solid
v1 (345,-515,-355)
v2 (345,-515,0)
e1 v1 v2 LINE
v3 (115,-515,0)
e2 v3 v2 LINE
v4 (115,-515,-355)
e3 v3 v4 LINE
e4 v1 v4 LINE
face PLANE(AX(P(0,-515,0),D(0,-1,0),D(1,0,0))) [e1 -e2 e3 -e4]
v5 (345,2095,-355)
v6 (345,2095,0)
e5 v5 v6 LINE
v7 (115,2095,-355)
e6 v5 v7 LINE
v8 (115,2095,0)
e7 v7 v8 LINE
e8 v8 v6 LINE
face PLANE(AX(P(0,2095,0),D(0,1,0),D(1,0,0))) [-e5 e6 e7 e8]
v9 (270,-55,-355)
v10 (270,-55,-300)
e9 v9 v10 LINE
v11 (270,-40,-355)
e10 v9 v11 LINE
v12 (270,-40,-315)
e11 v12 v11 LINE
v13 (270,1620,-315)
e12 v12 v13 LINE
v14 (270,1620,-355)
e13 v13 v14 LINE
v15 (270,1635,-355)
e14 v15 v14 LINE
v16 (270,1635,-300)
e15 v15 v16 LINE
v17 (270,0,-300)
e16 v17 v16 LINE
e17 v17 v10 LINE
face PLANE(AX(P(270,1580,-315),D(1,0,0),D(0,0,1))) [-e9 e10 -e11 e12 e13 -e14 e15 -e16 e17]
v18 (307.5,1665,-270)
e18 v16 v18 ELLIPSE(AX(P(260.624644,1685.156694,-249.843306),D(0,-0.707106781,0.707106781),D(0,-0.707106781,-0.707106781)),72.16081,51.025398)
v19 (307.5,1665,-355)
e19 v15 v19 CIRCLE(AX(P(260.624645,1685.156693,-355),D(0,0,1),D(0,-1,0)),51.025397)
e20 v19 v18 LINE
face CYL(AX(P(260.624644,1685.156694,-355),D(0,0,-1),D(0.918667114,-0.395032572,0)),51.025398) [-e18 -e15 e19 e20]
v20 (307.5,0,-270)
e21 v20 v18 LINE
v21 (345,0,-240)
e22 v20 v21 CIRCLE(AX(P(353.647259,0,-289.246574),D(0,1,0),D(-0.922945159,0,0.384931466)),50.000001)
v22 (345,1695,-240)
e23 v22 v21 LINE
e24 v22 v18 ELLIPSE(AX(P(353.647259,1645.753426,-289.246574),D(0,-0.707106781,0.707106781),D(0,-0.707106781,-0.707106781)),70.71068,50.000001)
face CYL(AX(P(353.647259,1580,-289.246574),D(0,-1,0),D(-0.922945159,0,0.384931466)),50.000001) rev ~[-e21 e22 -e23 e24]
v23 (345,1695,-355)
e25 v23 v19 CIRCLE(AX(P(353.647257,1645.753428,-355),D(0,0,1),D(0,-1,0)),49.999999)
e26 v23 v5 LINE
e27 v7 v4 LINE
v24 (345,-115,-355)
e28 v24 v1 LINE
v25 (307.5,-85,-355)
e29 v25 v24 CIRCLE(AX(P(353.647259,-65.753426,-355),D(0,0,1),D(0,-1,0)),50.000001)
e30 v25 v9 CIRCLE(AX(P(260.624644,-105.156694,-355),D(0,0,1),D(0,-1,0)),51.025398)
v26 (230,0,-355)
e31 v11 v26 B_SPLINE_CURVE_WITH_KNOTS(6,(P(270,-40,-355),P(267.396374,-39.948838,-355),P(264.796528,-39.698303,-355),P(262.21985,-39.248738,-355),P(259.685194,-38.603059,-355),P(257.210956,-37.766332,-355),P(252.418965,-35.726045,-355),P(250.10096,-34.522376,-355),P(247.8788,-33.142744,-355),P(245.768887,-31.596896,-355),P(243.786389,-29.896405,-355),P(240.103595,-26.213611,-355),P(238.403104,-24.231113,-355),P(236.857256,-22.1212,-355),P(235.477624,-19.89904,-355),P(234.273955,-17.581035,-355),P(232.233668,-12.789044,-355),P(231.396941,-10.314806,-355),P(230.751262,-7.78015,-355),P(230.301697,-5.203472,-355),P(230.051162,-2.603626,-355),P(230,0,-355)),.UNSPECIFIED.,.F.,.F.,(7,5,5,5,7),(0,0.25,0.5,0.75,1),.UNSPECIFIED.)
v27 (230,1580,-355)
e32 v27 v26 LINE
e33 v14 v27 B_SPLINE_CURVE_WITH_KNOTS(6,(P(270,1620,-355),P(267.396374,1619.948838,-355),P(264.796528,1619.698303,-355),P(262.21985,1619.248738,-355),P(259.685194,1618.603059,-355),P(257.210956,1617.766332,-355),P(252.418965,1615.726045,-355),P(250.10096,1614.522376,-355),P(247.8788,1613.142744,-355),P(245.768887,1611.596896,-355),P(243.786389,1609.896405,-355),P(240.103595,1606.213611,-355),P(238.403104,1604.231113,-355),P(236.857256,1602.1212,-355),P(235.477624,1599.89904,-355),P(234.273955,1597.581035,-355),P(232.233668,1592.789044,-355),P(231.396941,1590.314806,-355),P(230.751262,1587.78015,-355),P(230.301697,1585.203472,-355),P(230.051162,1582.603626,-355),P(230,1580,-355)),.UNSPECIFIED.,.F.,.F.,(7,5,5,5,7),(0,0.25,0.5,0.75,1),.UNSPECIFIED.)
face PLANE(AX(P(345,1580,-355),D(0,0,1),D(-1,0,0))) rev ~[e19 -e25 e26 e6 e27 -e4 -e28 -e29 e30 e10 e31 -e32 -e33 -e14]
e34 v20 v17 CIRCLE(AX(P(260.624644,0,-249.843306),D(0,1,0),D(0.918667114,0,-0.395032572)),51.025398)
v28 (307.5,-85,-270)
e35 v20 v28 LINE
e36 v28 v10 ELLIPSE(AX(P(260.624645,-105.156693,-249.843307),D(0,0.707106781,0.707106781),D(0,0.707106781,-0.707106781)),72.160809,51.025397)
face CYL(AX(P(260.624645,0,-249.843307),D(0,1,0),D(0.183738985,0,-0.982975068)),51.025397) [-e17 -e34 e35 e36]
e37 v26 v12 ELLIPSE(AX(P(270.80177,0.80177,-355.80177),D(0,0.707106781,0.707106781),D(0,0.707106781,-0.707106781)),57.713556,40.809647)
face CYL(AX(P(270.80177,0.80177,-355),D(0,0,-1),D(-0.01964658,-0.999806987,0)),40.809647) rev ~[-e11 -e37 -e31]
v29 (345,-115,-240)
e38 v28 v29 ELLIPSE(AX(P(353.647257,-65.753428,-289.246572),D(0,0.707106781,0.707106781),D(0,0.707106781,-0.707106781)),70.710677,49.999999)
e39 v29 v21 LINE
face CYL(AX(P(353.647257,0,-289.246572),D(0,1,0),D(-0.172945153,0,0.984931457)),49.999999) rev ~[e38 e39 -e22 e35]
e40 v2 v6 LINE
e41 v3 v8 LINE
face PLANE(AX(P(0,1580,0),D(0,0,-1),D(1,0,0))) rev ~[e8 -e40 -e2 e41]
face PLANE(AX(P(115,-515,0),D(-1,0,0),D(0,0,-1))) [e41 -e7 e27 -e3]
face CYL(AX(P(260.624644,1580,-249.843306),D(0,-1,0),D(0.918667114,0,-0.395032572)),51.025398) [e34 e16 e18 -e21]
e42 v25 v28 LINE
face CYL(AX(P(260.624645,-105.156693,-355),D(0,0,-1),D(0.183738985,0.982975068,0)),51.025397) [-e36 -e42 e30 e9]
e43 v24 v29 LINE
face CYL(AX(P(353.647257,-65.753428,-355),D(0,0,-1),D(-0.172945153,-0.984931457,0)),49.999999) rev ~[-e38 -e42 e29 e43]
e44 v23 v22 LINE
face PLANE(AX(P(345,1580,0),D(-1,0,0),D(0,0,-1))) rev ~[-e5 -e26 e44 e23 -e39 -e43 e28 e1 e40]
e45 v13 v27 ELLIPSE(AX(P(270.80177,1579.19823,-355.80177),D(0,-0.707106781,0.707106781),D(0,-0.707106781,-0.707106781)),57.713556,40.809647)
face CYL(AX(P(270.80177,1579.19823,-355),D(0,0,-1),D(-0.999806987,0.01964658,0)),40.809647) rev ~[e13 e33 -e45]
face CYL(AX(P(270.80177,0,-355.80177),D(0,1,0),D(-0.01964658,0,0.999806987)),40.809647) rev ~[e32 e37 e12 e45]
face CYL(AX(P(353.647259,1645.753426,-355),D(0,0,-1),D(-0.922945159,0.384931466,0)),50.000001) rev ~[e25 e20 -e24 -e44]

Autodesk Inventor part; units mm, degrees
ref_plane "YZ Plane" through (0, 0, 0) normal (1, 0, 0) x (0, 1, 0)
ref_plane "XZ Plane" through (0, 0, 0) normal (0, 1, 0) x (-1, 0, 0)
ref_plane "XY Plane" through (0, 0, 0) normal (0, 0, 1) x (1, 0, 0)
sketch "Sketch1" plane through (0, 0, 0) normal (0, 1, 0) x (-1, 0, 0)
  line L0 (0, 0) -> (0, -300)
  line L1 (0, -300) -> (-115, -300)
  line L2 (-115, -300) -> (-115, -355)
  line L3 (-115, -355) -> (-230, -355)
  line L4 (-230, -355) -> (-345, -355) construction
  line L5 (0, 0) -> (-345, 0)
  line L6 (-345, 0) -> (-345, -240)
  line L7 (-270, -300) -> (-270, -315)
  line L8 (-345, -240) -> (-270, -300) construction
  line L9 (-307.5, -270) -> (-270, -300) construction
  line L10 (-307.5, -270) -> (-345, -240) construction
  arc A0 (-307.5, -270) -> (-270, -300) centre (-260.624645, -249.843306) ccw
  arc A1 (-307.5, -270) -> (-345, -240) centre (-353.647258, -289.246573) ccw
  arc A2 (-230, -355) -> (-270, -315) centre (-270.80177, -355.80177) ccw
  point P0 (-288.75, -285)
  point P1 (-326.25, -255)
  dimension "d0" = 300
  dimension "d1" = 115
  dimension "d2" = 55
  dimension "d3" = 115
  dimension "d4" = 115
  dimension "d5" = 345
  dimension "d7" = 15
  dimension "d8" = 155
  dimension "d9" = 40
  dimension "d13" = 50
  dimension "d14" = 50
  dimension "d16" = 62.5
  dimension "d19" = 60
extrude "Extrusion1" add sketch "Sketch1" along normal blind 299
sketch "Sketch2" plane through (0, 299, 0) normal (0, 1, 0) x (1, 0, 0)
  line L0 (230, 355) -> (115, 355)
  line L1 (115, 355) -> (115, 300)
  line L2 (115, 300) -> (0, 300)
  line L3 (0, 300) -> (0, 0)
  line L4 (0, 0) -> (345, 0)
  line L5 (345, 0) -> (345, 240)
  arc A0 (307.5, 270) -> (345, 240) centre (353.647258, 289.246573) ccw
  arc A1 (307.5, 270) -> (270, 300) centre (260.624645, 249.843306) ccw
  line L6 (270, 300) -> (270, 315)
  arc A2 (230, 355) -> (270, 315) centre (270.80177, 355.80177) ccw
extrude "Extrusion2" add sketch "Sketch2" along normal blind 1281
sketch "Sketch3" plane through (0, 0, 0) normal (0, -1, 0) x (1, 0, 0)
  line L0 (230, -355) -> (115, -355) projected
  line L1 (115, -355) -> (115, -300) projected
  line L2 (115, -300) -> (0, -300) projected
  line L3 (0, -300) -> (0, 0) projected
  line L4 (0, 0) -> (345, 0) projected
  line L5 (345, 0) -> (345, -240) projected
  line L6 (230, -355) -> (345, -355)
  line L7 (345, -355) -> (345, -240)
extrude "Extrusion3" add sketch "Sketch3" along normal blind 515
sketch "Sketch4" plane through (0, 1580, 0) normal (0, 1, 0) x (1, 0, 0)
  line L0 (345, 0) -> (345, 240) projected
  line L1 (0, 0) -> (345, 0) projected
  line L2 (0, 300) -> (0, 0) projected
  line L3 (115, 300) -> (0, 300) projected
  line L4 (115, 355) -> (115, 300) projected
  line L5 (345, 355) -> (345, 240) projected
  line L6 (345, 240) -> (345, 355)
  line L7 (345, 355) -> (115, 355)
extrude "Extrusion4" add sketch "Sketch4" along normal blind 515
sketch "Sketch5" plane through (0, 1580, 0) normal (0, -1, 0) x (1, 0, 0)
  arc A0 (270, -315) -> (230, -355) centre (270.80177, -355.80177) ccw
  line L0 (345, -355) -> (230, -355)
  line L1 (345, -240) -> (345, -355)
  arc A1 (345, -240) -> (307.5, -270) centre (353.647258, -289.246573) ccw
  arc A2 (270, -300) -> (307.5, -270) centre (260.624645, -249.843306) ccw
  line L2 (270, -300) -> (270, -315)
  line L3 (424.37671, -355) -> (-70.729452, -355)
  point P0 (0, 0)
revolve "Revolution1" cut sketch "Sketch5" angle 360 about axis through (345, 1580, -355) along (-1, 0, 0)
sketch "Sketch6" plane through (0, 0, 0) normal (0, 1, 0) x (1, 0, 0)
  arc A0 (307.5, 270) -> (345, 240) centre (353.647258, 289.246573) ccw
  line L0 (345, 355) -> (345, 240)
  line L1 (230, 355) -> (345, 355)
  arc A1 (230, 355) -> (270, 315) centre (270.80177, 355.80177) ccw
  line L2 (270, 300) -> (270, 315)
  arc A2 (307.5, 270) -> (270, 300) centre (260.624645, 249.843306) ccw
  line L3 (-70.729452, 355) -> (424.37671, 355)
  point P0 (0, 0)
revolve "Revolution2" cut sketch "Sketch6" angle 360 about axis through (115, 0, -355) along (1, 0, 0)
sketch "Sketch12" plane through (345, -515, -355) normal (0, 0, -1) x (-1, 0, 0)
  arc A0 (0, 400) -> (37.5, 430) centre (-8.647258, 449.246573) ccw
  arc A1 (75, 460) -> (37.5, 430) centre (84.375355, 409.843306) ccw
  line L0 (75, 475) -> (75, 460)
  arc A2 (75, 475) -> (115, 515) centre (74.19823, 515.80177) ccw
  line L1 (0, 515) -> (37.5, 515)
  line L2 (75, 515) -> (37.5, 515)
  line L3 (75, 515) -> (115, 515)
  line L4 (0, 400) -> (0, 515)
  point P0 (345, 515)
extrude "Extrusion10" cut sketch "Sketch12" against normal blind 115
sketch "Sketch13" plane through (345, -515, -355) normal (0, 0, -1) x (-1, 0, 0)
  arc A0 (115, 2095) -> (75, 2135) centre (74.19823, 2094.19823) ccw
  line L0 (75, 2150) -> (75, 2135)
  arc A1 (37.5, 2180) -> (75, 2150) centre (84.375355, 2200.156694) ccw
  arc A2 (37.5, 2180) -> (0, 2210) centre (-8.647258, 2160.753427) ccw
  line L1 (0, 2095) -> (0, 2210)
  line L2 (0, 2095) -> (37.5, 2095)
  line L3 (75, 2095) -> (37.5, 2095)
  line L4 (75, 2095) -> (115, 2095)
  point P0 (345, 515)
extrude "Extrusion11" cut sketch "Sketch13" against normal blind 115
sketch "Sketch14" plane through (230, 0, -240) normal (0, -1, 0) x (1, 0, 0)
  arc A0 (40, -75) -> (0, -115) centre (40.80177, -115.80177) ccw
  line L0 (40, -60) -> (40, -75)
  arc A1 (40, -60) -> (77.5, -30) centre (30.624645, -9.843306) ccw
  arc A2 (115, 0) -> (77.5, -30) centre (123.647258, -49.246573) ccw
  line L1 (115, 0) -> (0, 0)
  line L2 (0, -115) -> (0, 0)
  point P0 (-230, 240)
extrude "Extrusion12" add sketch "Sketch14" along normal up to next
sketch "Sketch15" plane through (230, 1580, -240) normal (0, 1, 0) x (1, 0, 0)
  arc A0 (77.5, 30) -> (115, 0) centre (123.647258, 49.246573) ccw
  arc A1 (77.5, 30) -> (40, 60) centre (30.624645, 9.843306) ccw
  line L0 (40, 75) -> (40, 60)
  arc A2 (0, 115) -> (40, 75) centre (40.80177, 115.80177) ccw
  line L1 (0, 115) -> (0, 0)
  line L2 (0, 0) -> (115, 0)
  point P0 (-230, -240)
extrude "Extrusion13" add sketch "Sketch15" along normal up to next
sketch "Sketch16" plane through (0, -515, 0) normal (0, -1, 0) x (1, 0, 0)
  line L0 (0, -300) -> (115, -300) projected
  line L1 (0, 0) -> (0, -300) projected
  line L2 (0, 0) -> (115, 0)
  line L3 (115, 0) -> (115, -300)
extrude "Extrusion14" cut sketch "Sketch16" against normal through all
properties part number "Base Drawing"
